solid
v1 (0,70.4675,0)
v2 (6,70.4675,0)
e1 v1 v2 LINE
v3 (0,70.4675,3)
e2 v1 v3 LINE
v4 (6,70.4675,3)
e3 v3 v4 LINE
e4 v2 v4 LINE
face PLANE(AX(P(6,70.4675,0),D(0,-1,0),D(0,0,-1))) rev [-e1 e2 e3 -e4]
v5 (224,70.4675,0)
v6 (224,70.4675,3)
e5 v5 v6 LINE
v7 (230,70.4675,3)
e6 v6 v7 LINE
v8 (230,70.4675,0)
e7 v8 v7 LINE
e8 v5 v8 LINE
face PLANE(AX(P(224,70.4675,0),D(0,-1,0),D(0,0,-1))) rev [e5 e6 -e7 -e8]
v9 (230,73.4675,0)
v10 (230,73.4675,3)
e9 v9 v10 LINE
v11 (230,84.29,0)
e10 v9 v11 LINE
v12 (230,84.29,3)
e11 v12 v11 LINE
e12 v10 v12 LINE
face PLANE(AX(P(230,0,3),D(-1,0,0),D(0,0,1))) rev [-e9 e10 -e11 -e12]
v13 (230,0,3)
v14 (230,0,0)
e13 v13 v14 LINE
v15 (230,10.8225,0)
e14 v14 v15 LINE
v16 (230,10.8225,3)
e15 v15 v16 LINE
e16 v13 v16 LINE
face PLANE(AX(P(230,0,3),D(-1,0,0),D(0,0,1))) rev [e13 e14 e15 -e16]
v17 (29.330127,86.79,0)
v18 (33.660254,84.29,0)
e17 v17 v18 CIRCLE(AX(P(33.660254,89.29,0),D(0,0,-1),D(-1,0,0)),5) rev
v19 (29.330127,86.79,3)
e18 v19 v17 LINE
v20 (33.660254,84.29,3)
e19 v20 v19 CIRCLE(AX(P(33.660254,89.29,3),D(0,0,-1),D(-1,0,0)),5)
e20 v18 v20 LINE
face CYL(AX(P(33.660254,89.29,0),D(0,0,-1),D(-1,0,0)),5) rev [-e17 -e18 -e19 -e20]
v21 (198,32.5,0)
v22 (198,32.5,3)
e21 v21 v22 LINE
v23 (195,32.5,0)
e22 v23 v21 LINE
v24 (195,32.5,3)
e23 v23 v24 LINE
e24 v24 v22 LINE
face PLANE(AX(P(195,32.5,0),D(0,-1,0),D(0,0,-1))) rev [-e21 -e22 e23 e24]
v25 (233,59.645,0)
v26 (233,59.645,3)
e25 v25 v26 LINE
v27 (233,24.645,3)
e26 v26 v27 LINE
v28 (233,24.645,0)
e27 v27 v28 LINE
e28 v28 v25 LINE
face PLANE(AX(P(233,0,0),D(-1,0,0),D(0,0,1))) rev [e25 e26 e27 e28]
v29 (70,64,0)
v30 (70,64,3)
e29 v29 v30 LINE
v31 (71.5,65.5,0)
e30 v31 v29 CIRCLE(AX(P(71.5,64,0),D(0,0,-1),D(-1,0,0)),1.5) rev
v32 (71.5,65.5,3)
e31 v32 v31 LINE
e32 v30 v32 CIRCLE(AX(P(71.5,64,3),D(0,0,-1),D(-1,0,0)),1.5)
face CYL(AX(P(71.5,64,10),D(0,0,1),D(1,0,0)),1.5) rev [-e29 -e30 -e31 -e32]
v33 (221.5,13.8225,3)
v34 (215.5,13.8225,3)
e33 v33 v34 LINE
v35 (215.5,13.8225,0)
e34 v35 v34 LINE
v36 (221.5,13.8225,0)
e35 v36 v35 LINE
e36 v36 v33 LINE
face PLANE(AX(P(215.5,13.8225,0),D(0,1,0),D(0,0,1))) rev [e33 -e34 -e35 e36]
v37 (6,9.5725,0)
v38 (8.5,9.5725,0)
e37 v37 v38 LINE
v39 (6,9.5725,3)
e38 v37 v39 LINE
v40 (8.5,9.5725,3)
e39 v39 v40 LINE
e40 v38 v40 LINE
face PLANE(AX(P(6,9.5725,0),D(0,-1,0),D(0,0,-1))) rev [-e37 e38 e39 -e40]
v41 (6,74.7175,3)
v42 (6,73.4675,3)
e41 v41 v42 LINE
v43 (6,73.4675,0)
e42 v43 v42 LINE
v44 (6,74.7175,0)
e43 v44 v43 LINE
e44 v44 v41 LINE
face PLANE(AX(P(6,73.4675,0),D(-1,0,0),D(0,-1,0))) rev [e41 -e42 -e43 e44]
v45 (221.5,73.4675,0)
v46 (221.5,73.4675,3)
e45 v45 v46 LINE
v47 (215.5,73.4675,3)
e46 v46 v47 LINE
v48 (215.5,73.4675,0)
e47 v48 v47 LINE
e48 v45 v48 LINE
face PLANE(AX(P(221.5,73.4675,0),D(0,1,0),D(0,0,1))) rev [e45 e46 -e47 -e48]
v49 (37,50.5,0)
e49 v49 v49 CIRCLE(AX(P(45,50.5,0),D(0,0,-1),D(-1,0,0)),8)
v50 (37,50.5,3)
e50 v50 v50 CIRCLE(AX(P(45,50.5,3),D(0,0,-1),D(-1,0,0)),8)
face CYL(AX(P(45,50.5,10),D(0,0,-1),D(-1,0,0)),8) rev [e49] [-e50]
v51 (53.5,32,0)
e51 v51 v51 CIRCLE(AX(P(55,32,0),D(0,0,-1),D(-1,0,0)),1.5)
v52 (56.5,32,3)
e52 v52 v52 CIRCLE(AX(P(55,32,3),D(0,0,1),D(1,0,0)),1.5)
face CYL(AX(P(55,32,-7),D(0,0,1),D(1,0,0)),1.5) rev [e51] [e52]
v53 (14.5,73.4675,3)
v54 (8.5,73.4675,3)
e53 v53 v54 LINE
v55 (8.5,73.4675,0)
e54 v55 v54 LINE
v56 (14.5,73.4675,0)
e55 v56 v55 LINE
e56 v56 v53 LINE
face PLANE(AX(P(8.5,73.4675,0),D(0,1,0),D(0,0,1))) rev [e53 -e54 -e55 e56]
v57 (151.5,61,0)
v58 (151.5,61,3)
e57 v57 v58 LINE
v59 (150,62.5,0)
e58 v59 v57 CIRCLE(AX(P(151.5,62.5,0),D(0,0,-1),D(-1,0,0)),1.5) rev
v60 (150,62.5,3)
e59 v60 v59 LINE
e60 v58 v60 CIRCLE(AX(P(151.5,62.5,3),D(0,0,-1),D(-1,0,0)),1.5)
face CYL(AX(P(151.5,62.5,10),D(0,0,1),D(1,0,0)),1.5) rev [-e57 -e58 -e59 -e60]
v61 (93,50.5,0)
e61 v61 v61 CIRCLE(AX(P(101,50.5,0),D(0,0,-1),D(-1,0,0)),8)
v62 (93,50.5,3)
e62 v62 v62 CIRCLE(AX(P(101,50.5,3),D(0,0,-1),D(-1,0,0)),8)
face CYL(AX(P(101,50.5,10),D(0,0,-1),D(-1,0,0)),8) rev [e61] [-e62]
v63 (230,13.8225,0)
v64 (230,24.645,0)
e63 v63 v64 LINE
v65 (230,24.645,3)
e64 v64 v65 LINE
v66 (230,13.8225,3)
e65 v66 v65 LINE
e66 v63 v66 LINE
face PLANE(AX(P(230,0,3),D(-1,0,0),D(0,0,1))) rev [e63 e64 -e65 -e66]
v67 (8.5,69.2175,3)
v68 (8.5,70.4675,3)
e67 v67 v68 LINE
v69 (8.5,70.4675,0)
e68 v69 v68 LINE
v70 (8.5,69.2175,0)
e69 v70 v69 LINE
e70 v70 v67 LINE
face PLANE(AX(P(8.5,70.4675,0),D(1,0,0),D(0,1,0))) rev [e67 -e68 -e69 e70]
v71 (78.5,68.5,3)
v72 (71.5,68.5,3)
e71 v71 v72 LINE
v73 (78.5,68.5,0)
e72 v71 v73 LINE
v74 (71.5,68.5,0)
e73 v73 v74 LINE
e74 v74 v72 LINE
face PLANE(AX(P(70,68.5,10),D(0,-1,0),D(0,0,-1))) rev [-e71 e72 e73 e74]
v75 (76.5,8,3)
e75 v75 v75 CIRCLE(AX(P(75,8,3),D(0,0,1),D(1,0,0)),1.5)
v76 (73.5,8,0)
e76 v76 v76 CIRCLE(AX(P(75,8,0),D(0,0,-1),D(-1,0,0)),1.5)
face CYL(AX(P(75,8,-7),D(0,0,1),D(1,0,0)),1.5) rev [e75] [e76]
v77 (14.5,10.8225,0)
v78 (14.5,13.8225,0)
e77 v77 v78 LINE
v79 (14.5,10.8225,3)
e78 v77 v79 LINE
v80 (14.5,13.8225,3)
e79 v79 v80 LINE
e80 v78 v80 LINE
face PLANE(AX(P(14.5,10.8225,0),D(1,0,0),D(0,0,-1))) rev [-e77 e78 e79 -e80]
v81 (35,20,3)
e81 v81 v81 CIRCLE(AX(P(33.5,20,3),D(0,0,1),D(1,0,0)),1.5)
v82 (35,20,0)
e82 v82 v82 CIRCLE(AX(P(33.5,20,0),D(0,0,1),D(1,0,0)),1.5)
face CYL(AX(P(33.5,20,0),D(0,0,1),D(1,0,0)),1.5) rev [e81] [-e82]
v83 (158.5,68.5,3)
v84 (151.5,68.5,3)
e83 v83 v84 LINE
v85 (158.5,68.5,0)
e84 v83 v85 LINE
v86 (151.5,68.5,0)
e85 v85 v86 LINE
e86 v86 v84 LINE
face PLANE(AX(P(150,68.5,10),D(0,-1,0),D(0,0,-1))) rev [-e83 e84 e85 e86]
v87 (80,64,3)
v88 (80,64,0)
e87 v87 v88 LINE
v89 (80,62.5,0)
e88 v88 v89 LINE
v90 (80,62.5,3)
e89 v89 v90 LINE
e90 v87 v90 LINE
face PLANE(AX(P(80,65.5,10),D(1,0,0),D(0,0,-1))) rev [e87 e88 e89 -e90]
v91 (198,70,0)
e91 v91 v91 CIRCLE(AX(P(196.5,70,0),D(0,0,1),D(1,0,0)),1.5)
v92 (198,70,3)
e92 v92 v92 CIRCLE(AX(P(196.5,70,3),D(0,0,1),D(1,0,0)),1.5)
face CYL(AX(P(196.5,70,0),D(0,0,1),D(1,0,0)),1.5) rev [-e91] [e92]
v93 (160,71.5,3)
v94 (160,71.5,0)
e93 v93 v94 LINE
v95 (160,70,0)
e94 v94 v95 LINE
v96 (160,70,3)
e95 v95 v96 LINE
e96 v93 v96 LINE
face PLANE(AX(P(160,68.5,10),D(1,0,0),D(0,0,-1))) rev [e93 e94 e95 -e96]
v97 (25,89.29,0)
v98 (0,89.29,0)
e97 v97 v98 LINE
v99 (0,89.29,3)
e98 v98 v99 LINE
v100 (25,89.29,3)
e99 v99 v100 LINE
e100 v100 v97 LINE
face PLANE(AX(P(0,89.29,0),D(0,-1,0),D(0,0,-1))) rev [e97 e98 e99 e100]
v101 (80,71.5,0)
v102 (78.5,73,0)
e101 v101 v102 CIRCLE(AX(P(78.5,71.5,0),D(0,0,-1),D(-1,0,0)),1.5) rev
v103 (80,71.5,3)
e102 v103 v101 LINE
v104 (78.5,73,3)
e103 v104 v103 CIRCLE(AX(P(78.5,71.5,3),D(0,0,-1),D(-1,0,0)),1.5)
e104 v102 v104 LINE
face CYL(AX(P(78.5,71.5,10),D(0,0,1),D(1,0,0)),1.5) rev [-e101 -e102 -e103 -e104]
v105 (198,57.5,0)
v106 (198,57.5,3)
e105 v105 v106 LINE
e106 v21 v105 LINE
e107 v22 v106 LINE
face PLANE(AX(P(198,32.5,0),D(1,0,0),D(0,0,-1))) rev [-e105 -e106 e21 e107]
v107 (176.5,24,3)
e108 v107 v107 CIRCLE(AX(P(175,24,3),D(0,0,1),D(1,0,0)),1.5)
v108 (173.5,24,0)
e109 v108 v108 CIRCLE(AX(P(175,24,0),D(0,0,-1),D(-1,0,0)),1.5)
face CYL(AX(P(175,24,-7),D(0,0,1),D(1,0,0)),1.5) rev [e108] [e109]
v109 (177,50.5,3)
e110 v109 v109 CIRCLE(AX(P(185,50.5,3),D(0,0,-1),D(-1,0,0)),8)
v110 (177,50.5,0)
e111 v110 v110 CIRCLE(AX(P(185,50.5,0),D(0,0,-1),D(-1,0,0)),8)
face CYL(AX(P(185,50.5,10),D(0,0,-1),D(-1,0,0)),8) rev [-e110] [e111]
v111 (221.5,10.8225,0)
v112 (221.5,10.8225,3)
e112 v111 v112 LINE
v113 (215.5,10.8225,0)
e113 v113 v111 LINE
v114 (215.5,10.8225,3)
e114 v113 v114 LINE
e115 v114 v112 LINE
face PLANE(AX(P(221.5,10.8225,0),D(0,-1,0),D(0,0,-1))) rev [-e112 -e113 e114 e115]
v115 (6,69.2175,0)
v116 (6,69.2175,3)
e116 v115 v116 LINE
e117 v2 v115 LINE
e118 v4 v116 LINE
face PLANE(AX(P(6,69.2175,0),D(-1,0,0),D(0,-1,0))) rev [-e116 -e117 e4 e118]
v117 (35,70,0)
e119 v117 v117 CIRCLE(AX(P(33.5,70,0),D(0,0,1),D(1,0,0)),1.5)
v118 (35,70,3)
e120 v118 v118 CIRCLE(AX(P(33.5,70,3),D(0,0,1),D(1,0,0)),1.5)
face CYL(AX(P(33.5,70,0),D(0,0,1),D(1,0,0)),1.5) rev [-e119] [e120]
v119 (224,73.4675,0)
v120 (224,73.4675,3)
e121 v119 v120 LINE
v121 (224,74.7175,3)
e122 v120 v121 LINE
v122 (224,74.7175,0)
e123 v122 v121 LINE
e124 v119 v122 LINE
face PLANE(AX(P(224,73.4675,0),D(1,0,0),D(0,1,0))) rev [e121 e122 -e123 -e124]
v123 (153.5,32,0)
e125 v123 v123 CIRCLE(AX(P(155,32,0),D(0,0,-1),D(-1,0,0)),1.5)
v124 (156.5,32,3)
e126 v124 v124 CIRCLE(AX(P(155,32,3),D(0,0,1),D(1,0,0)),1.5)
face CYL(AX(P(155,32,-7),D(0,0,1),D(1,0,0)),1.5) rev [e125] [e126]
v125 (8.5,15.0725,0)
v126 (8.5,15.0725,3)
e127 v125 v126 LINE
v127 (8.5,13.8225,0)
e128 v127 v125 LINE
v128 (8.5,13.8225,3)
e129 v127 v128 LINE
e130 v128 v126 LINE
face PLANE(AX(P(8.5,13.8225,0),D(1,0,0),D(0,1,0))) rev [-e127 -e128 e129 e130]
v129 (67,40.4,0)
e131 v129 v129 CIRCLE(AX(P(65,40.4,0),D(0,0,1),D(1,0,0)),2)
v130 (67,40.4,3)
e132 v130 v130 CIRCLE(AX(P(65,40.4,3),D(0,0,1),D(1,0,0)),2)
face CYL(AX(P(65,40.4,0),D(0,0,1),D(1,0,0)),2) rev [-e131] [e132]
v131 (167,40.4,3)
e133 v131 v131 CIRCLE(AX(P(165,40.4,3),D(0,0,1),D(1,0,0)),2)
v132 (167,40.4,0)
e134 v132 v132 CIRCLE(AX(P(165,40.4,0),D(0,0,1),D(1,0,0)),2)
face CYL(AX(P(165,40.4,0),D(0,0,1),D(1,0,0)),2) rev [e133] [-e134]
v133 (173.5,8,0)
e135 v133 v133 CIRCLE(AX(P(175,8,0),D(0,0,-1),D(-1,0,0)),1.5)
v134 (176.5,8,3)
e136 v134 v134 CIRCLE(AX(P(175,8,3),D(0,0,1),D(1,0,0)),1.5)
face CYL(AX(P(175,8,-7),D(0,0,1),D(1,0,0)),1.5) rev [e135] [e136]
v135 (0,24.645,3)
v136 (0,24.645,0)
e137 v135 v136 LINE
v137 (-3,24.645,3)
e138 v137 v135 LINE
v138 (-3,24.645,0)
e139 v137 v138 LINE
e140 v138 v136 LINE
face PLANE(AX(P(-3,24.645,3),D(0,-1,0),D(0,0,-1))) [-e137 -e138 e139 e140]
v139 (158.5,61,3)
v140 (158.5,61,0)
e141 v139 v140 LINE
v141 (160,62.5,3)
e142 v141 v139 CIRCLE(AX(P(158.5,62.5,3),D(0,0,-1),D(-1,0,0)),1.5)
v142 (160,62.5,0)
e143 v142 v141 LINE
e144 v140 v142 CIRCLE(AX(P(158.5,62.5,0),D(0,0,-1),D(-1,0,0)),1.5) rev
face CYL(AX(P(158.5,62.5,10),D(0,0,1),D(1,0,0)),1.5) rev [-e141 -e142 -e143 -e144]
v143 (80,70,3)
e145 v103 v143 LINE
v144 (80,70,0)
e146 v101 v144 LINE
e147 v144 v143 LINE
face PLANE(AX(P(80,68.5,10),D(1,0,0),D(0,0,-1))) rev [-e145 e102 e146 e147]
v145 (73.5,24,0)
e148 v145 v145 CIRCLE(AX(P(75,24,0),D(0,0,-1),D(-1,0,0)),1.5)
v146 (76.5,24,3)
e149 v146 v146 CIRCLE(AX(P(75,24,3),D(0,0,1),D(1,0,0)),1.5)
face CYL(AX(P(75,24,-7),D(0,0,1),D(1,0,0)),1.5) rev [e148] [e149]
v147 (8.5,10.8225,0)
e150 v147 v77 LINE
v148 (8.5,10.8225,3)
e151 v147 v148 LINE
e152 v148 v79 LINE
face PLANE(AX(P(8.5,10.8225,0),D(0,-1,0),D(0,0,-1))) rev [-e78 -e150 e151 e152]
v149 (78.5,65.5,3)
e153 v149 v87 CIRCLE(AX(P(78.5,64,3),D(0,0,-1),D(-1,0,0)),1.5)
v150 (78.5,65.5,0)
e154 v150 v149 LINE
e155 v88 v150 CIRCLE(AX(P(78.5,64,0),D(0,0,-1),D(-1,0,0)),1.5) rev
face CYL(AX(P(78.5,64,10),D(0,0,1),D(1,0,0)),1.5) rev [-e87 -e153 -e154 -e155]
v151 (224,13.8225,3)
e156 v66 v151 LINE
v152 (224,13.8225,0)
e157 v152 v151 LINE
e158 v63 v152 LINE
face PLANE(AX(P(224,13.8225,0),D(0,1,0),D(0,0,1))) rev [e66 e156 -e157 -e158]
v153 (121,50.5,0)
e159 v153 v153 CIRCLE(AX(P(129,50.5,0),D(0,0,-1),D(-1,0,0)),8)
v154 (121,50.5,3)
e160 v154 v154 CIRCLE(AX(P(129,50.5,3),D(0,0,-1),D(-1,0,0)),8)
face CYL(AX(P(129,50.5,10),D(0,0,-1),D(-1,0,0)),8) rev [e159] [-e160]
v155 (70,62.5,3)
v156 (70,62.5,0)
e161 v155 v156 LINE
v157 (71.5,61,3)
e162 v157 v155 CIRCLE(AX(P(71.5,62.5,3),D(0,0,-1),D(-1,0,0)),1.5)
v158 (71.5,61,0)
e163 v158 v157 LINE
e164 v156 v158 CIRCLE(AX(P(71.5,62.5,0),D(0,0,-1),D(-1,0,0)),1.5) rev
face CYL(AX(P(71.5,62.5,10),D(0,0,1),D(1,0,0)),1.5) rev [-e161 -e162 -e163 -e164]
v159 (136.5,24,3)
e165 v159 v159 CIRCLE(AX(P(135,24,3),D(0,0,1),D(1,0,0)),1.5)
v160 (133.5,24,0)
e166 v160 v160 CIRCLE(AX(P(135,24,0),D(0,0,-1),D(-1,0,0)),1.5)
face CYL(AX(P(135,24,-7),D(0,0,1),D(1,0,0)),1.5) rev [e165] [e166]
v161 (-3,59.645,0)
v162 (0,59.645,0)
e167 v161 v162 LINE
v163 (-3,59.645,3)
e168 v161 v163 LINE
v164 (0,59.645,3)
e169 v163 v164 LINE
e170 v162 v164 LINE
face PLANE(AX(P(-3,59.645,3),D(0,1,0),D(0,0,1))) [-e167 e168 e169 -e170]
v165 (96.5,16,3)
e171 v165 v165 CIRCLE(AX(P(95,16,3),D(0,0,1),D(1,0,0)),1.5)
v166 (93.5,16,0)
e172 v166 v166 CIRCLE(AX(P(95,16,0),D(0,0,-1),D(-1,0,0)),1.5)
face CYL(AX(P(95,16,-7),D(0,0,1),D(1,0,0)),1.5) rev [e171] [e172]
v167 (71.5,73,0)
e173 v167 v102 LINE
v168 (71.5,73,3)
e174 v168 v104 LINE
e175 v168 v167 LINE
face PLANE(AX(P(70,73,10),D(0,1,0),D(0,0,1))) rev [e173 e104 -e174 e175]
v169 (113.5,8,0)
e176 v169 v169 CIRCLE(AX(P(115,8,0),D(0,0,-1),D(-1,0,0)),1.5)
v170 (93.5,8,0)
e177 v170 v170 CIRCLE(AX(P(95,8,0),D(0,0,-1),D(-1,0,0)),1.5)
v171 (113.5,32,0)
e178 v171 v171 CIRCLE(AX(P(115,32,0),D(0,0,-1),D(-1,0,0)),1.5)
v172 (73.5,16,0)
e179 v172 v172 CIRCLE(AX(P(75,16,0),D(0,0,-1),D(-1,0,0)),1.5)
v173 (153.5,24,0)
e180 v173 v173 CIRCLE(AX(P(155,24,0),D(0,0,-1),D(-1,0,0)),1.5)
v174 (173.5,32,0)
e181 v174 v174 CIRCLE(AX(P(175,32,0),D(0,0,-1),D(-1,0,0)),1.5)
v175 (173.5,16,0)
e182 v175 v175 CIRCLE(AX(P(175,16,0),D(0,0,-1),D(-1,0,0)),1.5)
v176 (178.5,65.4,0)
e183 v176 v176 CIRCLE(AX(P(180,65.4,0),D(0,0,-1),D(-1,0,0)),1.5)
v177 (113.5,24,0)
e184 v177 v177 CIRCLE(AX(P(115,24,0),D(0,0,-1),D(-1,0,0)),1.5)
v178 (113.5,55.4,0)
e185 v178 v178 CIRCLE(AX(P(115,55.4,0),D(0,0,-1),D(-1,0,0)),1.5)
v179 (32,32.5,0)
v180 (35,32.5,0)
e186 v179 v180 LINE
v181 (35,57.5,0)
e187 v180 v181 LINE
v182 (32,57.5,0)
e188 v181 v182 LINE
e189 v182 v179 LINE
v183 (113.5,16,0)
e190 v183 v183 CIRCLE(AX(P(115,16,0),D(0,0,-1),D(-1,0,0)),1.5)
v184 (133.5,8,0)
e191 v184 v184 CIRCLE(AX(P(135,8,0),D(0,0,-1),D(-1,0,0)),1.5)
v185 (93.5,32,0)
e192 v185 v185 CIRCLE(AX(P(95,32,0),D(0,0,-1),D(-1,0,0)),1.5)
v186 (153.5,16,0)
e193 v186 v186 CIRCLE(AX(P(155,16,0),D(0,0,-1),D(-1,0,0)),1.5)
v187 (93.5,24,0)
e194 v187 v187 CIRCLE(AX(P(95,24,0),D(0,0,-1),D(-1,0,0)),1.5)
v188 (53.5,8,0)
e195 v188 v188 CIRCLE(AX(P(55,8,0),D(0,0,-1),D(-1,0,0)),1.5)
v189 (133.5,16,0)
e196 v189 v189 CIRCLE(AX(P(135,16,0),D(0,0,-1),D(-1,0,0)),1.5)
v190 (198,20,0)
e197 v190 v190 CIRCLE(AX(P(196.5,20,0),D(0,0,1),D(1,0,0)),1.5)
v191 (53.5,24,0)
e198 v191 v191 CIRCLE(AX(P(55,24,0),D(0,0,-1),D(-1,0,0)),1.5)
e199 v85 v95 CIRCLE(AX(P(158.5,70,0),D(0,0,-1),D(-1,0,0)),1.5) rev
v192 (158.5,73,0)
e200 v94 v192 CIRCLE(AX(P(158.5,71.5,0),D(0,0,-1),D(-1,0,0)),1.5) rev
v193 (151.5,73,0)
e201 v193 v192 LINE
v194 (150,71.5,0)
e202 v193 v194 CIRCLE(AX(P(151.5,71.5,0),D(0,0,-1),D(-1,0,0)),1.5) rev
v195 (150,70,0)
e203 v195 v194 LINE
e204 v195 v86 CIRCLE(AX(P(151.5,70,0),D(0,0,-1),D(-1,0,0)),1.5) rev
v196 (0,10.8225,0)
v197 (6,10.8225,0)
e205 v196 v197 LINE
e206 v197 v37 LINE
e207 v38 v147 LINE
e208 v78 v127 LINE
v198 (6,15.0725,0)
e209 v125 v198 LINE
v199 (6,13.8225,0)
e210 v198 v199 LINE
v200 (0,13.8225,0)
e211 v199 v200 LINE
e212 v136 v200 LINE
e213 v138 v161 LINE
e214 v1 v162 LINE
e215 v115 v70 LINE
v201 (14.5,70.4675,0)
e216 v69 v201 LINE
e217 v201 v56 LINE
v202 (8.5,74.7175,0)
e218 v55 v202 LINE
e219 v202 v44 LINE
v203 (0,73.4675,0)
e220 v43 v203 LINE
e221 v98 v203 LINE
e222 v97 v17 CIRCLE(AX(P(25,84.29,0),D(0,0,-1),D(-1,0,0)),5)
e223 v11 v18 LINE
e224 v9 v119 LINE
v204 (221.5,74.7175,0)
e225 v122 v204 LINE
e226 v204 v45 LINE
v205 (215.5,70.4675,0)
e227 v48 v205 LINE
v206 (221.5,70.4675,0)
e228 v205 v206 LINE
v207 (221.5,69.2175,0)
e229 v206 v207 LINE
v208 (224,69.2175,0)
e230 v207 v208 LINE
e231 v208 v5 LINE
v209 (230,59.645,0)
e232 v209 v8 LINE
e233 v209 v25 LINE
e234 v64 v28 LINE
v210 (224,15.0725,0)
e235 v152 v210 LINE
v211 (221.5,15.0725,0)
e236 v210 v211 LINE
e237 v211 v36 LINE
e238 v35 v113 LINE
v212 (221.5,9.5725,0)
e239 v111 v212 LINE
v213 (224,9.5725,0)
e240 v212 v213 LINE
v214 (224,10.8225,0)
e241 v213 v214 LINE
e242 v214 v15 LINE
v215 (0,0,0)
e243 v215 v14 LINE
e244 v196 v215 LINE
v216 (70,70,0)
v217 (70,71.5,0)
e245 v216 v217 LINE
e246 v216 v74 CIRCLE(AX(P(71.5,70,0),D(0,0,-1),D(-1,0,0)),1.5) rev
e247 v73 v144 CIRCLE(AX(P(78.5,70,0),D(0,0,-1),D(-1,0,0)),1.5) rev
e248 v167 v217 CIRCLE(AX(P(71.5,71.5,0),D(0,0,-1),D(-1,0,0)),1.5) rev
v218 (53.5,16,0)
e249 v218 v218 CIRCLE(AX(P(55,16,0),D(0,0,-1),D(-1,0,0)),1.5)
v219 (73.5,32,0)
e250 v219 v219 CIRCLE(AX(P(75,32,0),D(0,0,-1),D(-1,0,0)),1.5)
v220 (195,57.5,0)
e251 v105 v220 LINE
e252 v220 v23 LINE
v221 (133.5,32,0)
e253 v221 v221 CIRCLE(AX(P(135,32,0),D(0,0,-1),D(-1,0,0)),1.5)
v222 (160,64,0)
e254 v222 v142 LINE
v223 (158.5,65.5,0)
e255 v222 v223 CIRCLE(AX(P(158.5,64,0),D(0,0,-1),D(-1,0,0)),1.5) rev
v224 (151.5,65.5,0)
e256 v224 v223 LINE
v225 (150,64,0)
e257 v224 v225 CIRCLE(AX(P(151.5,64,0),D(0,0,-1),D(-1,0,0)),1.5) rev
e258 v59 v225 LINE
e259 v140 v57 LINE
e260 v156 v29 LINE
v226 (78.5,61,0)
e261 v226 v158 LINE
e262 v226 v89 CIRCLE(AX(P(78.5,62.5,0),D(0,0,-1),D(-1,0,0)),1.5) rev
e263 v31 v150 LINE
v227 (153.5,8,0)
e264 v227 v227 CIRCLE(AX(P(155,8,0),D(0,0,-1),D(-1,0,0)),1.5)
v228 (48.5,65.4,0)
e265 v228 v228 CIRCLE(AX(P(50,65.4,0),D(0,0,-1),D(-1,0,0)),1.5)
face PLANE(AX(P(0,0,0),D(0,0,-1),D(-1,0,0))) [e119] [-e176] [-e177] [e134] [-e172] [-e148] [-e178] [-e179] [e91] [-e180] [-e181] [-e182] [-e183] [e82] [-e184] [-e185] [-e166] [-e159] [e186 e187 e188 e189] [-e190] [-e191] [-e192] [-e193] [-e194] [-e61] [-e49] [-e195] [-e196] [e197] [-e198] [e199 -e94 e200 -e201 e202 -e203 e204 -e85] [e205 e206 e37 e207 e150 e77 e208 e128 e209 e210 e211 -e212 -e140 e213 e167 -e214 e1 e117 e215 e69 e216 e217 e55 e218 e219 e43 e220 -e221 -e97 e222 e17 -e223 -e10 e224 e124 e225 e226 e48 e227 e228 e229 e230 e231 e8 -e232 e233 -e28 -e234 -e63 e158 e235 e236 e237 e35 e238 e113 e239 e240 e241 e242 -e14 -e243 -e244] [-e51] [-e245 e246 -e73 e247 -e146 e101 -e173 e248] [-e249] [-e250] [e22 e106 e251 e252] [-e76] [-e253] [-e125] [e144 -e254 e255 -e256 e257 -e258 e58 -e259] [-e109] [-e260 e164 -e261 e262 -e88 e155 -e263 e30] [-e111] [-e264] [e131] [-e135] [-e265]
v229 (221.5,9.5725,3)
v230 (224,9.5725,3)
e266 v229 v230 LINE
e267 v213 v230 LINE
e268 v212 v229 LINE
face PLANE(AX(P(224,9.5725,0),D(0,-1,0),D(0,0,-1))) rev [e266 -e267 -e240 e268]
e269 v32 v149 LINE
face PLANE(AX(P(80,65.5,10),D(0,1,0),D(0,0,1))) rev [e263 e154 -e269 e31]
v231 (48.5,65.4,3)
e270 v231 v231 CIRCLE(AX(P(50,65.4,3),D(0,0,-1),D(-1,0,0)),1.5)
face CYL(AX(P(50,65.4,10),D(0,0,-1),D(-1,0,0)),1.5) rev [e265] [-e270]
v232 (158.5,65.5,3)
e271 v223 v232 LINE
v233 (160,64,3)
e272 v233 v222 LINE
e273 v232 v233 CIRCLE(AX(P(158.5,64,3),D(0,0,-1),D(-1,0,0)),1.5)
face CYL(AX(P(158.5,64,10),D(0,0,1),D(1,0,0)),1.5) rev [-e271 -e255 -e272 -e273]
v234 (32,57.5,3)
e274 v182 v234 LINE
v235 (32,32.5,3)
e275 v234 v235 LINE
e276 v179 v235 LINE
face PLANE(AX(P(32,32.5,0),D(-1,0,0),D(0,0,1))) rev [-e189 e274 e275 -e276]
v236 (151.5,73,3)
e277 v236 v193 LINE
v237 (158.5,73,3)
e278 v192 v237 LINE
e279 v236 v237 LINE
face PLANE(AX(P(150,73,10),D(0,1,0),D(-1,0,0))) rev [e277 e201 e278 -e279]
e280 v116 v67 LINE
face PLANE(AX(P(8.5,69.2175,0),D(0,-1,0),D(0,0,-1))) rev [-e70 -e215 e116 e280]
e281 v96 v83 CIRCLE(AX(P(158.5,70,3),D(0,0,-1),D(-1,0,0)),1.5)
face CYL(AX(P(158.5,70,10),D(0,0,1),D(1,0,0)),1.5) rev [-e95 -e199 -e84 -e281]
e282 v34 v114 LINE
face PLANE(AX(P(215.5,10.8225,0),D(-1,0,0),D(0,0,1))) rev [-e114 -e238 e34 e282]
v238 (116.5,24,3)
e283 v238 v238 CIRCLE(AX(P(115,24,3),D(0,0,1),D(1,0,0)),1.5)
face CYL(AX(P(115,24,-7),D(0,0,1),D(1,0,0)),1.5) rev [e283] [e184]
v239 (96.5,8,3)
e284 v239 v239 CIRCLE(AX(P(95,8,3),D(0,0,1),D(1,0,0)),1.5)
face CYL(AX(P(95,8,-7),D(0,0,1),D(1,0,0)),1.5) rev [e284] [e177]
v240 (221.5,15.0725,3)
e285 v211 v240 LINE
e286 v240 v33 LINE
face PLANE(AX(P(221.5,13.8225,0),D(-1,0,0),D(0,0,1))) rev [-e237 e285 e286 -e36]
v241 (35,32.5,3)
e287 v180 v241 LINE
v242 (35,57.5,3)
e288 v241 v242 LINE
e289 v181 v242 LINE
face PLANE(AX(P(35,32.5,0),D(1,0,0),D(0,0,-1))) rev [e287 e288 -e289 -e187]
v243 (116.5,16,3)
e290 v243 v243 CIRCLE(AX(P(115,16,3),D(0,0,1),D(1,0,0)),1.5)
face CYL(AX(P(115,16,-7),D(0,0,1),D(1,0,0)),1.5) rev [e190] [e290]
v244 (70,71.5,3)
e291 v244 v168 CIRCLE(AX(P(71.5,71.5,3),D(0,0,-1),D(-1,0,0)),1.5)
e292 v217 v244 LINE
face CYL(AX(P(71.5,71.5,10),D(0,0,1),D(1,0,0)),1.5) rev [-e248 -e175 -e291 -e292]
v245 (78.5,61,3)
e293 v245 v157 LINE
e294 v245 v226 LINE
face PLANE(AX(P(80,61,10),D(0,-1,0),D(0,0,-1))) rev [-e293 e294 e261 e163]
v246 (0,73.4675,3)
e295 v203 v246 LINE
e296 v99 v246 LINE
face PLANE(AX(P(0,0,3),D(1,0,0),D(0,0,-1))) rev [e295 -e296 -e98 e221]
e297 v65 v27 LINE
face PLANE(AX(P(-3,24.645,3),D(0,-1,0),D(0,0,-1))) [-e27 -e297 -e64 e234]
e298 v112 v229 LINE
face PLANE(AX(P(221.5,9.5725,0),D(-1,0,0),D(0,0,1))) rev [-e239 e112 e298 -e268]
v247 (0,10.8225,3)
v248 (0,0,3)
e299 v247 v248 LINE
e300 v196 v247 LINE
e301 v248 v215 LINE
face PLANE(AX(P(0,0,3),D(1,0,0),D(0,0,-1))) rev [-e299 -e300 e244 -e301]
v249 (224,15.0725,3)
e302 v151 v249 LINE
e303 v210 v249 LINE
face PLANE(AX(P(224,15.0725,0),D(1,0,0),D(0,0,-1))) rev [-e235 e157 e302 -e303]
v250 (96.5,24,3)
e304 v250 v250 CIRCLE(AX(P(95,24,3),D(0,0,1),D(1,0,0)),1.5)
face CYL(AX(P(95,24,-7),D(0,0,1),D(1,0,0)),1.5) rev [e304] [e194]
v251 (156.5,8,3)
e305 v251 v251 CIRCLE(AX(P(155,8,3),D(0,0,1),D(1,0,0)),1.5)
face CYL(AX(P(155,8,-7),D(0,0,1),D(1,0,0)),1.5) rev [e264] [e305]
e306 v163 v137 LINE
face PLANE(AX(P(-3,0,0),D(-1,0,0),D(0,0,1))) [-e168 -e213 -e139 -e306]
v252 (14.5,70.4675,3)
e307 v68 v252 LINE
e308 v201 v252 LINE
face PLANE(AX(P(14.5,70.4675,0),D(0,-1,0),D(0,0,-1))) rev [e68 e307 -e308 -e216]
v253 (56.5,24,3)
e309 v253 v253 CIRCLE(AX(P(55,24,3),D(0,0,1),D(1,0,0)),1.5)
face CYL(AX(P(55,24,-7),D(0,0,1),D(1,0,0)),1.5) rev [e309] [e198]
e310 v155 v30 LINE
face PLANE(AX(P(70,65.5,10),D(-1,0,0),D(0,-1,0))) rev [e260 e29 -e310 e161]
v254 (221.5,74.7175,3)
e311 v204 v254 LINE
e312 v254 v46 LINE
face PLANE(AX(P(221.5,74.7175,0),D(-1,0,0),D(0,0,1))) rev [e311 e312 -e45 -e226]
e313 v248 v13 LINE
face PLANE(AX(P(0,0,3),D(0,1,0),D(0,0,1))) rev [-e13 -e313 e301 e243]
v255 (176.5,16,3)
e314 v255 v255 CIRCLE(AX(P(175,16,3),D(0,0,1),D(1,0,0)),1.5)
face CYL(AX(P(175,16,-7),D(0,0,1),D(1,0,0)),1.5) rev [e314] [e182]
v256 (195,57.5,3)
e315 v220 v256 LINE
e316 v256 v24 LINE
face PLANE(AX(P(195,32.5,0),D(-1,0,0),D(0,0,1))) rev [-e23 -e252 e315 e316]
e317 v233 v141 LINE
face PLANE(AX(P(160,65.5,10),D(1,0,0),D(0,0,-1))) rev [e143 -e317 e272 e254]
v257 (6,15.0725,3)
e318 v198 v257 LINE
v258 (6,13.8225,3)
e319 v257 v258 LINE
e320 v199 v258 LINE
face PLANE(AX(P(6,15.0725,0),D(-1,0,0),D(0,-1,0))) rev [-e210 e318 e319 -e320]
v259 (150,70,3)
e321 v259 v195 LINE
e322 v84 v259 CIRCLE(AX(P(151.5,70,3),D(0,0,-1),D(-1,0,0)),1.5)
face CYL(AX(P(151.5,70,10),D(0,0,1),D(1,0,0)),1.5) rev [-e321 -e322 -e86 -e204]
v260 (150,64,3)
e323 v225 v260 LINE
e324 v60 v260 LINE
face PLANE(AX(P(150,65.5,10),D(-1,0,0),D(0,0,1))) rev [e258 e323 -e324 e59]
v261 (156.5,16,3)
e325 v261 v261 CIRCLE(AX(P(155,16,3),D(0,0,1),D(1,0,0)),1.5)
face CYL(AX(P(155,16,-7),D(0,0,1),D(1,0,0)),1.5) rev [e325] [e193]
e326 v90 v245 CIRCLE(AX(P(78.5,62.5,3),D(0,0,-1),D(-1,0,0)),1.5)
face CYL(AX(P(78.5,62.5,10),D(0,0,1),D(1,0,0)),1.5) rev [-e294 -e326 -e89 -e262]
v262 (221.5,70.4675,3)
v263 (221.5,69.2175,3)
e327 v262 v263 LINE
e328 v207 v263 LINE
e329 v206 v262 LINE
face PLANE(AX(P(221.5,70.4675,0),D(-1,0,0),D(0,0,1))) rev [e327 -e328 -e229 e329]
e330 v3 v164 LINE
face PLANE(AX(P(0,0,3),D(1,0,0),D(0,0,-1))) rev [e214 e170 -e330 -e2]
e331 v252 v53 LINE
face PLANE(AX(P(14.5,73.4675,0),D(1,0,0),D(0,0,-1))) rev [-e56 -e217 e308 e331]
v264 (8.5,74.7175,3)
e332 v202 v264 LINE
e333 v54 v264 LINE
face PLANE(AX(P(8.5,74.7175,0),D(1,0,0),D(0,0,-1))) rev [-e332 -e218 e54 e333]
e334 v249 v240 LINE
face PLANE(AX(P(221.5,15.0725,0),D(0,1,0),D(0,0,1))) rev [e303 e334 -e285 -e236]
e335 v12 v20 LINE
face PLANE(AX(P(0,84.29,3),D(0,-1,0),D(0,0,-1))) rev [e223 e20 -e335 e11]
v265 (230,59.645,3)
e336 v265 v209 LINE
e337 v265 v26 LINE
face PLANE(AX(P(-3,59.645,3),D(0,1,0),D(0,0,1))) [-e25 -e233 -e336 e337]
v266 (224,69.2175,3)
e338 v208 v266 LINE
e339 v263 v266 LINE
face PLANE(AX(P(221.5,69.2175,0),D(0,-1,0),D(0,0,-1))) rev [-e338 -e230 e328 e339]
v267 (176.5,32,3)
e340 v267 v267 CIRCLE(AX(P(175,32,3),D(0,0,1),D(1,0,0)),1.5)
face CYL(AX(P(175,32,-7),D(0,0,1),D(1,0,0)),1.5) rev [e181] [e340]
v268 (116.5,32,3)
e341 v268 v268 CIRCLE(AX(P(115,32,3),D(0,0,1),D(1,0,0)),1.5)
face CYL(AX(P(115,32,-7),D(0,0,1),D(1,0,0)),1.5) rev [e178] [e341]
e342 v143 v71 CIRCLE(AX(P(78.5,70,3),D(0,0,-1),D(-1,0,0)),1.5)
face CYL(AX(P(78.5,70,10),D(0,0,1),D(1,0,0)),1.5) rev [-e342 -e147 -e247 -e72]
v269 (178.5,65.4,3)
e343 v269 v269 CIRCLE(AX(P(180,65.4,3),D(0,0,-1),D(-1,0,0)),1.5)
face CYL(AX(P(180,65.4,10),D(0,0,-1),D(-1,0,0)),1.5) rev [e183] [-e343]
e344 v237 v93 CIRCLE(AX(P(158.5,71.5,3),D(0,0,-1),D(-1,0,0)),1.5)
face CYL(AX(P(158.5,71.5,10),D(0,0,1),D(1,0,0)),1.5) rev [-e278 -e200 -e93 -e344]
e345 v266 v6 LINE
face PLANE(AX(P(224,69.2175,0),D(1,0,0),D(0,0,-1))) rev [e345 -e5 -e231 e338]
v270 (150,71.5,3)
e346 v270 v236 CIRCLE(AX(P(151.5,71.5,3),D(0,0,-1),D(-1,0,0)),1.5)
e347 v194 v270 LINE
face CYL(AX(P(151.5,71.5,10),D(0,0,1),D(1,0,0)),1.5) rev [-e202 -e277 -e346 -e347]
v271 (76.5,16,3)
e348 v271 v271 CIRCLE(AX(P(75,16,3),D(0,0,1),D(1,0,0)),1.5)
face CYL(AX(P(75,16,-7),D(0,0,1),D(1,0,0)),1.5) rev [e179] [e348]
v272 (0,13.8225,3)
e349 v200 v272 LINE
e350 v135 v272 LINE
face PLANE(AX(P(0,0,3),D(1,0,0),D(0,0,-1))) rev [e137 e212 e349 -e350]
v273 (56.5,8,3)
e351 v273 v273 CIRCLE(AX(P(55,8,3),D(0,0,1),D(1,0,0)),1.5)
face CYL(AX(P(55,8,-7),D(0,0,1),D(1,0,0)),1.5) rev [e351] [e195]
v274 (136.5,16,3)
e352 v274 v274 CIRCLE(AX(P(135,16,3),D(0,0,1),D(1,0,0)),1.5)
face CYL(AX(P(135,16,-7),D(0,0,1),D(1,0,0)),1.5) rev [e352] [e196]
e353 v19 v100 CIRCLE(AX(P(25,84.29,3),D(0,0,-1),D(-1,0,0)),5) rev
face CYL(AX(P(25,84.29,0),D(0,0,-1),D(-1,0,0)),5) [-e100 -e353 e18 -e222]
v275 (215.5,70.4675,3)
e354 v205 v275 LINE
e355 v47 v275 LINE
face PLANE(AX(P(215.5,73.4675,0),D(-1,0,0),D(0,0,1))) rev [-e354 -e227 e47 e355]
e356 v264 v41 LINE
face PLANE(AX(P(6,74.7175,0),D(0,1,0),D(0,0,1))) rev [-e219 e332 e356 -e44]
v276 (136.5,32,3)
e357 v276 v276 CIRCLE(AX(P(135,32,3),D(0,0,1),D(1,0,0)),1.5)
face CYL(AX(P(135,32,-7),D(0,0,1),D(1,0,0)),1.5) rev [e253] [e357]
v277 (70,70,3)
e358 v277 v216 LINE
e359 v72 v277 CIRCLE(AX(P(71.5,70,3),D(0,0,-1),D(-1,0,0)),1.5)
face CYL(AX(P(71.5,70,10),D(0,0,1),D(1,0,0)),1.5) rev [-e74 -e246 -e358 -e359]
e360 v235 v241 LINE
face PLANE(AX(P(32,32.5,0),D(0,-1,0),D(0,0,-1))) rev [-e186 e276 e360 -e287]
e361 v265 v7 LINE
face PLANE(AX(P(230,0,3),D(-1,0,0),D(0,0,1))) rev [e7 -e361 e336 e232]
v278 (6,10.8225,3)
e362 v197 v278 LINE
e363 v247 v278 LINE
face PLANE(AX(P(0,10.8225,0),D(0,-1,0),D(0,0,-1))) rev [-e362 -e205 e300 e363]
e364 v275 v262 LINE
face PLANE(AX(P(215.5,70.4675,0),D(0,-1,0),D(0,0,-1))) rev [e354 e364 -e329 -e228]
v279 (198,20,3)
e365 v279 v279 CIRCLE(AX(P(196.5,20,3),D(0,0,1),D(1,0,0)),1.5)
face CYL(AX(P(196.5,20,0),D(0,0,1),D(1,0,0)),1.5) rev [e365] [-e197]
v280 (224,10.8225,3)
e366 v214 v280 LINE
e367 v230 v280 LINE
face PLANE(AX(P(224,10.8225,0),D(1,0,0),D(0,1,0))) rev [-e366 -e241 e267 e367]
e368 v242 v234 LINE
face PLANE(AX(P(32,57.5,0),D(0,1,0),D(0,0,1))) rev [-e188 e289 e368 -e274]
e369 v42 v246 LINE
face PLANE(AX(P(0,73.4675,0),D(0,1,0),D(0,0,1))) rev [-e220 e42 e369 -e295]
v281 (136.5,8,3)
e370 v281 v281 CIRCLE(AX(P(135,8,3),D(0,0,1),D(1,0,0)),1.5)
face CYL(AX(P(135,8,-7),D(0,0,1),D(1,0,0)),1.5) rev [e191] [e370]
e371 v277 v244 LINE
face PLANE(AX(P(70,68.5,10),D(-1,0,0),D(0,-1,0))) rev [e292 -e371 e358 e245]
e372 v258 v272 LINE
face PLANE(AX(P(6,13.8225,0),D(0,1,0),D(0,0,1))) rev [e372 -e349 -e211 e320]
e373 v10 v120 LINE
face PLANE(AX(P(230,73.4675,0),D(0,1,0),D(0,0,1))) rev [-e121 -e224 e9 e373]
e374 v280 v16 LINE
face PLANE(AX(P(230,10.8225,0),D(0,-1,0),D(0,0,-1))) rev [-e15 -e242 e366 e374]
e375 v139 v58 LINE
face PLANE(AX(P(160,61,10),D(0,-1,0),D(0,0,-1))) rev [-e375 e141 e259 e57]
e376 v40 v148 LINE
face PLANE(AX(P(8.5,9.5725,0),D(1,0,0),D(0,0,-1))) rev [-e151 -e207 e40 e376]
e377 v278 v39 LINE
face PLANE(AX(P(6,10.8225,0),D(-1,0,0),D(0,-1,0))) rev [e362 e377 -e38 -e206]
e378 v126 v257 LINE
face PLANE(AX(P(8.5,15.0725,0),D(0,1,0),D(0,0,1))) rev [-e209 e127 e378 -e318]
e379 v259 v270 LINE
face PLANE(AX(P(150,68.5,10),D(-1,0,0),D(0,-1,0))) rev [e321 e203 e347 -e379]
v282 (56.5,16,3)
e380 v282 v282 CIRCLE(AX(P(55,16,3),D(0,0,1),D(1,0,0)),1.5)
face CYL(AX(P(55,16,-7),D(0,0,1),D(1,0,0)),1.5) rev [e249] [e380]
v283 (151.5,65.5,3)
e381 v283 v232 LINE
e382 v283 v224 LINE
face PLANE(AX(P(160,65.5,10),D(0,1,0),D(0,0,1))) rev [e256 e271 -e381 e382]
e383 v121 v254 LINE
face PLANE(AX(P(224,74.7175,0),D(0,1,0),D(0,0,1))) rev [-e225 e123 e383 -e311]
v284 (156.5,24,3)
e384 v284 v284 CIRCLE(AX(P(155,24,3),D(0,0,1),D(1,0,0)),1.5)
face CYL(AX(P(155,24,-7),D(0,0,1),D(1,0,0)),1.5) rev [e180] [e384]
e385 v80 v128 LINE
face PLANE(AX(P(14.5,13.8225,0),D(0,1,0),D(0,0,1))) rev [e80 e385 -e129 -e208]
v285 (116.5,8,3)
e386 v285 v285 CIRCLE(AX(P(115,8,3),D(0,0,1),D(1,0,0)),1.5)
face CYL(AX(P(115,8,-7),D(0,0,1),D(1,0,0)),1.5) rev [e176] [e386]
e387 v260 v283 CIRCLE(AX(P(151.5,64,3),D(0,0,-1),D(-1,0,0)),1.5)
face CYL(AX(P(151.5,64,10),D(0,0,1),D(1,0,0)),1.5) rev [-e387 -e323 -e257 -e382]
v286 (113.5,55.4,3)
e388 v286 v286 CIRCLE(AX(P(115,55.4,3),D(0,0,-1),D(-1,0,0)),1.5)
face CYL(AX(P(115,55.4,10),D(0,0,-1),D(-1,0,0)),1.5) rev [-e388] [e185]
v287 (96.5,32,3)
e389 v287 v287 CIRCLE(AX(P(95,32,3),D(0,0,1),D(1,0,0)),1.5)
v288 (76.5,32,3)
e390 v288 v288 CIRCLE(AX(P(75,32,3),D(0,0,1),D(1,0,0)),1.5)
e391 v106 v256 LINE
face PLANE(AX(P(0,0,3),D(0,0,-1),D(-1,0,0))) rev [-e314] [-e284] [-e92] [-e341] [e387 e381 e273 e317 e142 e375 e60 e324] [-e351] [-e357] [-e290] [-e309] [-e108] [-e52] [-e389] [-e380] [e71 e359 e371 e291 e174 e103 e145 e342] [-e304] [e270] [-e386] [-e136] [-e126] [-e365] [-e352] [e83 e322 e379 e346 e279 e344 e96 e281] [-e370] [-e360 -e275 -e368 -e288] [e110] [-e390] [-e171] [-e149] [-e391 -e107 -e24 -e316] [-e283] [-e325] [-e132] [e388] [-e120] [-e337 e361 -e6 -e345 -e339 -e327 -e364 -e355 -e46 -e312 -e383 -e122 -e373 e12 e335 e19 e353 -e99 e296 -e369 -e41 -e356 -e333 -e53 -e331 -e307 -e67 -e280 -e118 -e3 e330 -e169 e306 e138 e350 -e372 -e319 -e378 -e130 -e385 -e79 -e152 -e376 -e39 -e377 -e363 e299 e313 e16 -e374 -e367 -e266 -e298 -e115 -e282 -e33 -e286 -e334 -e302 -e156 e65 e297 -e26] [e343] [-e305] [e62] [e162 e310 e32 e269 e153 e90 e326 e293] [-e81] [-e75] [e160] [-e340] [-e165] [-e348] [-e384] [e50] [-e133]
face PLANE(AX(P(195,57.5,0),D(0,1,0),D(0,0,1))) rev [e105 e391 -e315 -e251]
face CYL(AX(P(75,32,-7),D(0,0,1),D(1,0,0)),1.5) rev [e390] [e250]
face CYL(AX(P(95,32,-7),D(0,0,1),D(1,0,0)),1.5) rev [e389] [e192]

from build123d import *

# Parameters (mm, degrees)
SKETCH_1_W                  = 230
SKETCH_1_H                  = 84.29
EXTRUDE_1_DEPTH             = 3
EXTRUDE_2_DEPTH             = 3
EXTRUDE_2_DEPTH_BACK        = 233
SKETCH_3_W                  = 3
SKETCH_3_H                  = 35
SKETCH_2_R                  = 2
CUT_EXTRUDE_1_DEPTH         = 3
SKETCH_5_R                  = 1.5
CUT_EXTRUDE_2_DEPTH         = 3
SKETCH_6_W                  = 3
SKETCH_6_H                  = 25
CUT_EXTRUDE_3_DEPTH         = 3
CUT_EXTRUDE_4_DEPTH         = 3
SKETCH_8_W                  = 30
SKETCH_8_H                  = 3
EXTRUDE_3_DEPTH             = 5
FILLET_1_R                  = 5
FILLET_2_R                  = 5
SKETCH_9_R                  = 1.5
CUT_EXTRUDE_5_DEPTH         = 10
SKETCH_10_R                 = 8
CUT_EXTRUDE_6_DEPTH         = 10
SKETCH_11_W                 = 10
SKETCH_11_H                 = 4.5
CUT_EXTRUDE_7_DEPTH         = 10
FILLET_3_R                  = 1.5
SKETCH_12_R                 = 1.5
CUT_EXTRUDE_8_DEPTH         = 10
PATTERN_LINEAR_1_COUNT      = 7
PATTERN_LINEAR_1_PITCH      = 20
PATTERN_LINEAR_1_COUNT_DIR2 = 4
PATTERN_LINEAR_1_PITCH_DIR2 = 8


with BuildPart() as part:
    # Эскиз1 → Бобышка-Вытянуть1 (new body)
    with BuildSketch(Plane.XY):
        with Locations((115, 42.145)):
            Rectangle(SKETCH_1_W, SKETCH_1_H)
    extrude(amount=EXTRUDE_1_DEPTH)

    # Эскиз3 → Бобышка-Вытянуть2 (add, two sides: drawn at the far end of the back side and taken through both)
    with BuildSketch(Plane(origin=(230, 0, 0), x_dir=(0, 0, -1), z_dir=(1, 0, 0)).offset(-EXTRUDE_2_DEPTH_BACK)):
        with Locations((-1.5, 42.145)):
            Rectangle(SKETCH_3_W, SKETCH_3_H)
    extrude(amount=EXTRUDE_2_DEPTH + EXTRUDE_2_DEPTH_BACK)

    # Эскиз2 → Вырез-Вытянуть1 (cut)
    with BuildSketch(Plane.XY.offset(3)):
        with Locations((65, 40.4)):
            Circle(SKETCH_2_R)
        with Locations((165, 40.4)):
            Circle(SKETCH_2_R)
    extrude(amount=-CUT_EXTRUDE_1_DEPTH, mode=Mode.SUBTRACT)

    # Эскиз5 → Вырез-Вытянуть2 (cut)
    with BuildSketch(Plane.XY.offset(3)):
        with Locations((33.5, 70)):
            Circle(SKETCH_5_R)
        with Locations((33.5, 20)):
            Circle(SKETCH_5_R)
        with Locations((196.5, 20)):
            Circle(SKETCH_5_R)
        with Locations((196.5, 70)):
            Circle(SKETCH_5_R)
    extrude(amount=-CUT_EXTRUDE_2_DEPTH, mode=Mode.SUBTRACT)

    # Эскиз6 → Вырез-Вытянуть3 (cut)
    with BuildSketch(Plane.XY.offset(3)):
        with Locations((33.5, 45)):
            Rectangle(SKETCH_6_W, SKETCH_6_H)
        with Locations((196.5, 45)):
            Rectangle(SKETCH_6_W, SKETCH_6_H)
    extrude(amount=-CUT_EXTRUDE_3_DEPTH, mode=Mode.SUBTRACT)

    # Эскиз7 → Вырез-Вытянуть4 (cut)
    with BuildSketch(Plane.XY.offset(3)):
        Polygon((0, 73.4675), (6, 73.4675), (6, 74.7175), (8.5, 74.7175), (8.5, 73.4675), (14.5, 73.4675), (14.5, 70.4675), (8.5, 70.4675), (8.5, 69.2175), (6, 69.2175), (6, 70.4675), (0, 70.4675), align=None)
        Polygon((0, 13.8225), (0, 10.8225), (6, 10.8225), (6, 9.5725), (8.5, 9.5725), (8.5, 10.8225), (14.5, 10.8225), (14.5, 13.8225), (8.5, 13.8225), (8.5, 15.0725), (6, 15.0725), (6, 13.8225), align=None)
        Polygon((230, 10.8225), (224, 10.8225), (224, 9.5725), (221.5, 9.5725), (221.5, 10.8225), (215.5, 10.8225), (215.5, 13.8225), (221.5, 13.8225), (221.5, 15.0725), (224, 15.0725), (224, 13.8225), (230, 13.8225), align=None)
        Polygon((230, 70.4675), (230, 73.4675), (224, 73.4675), (224, 74.7175), (221.5, 74.7175), (221.5, 73.4675), (215.5, 73.4675), (215.5, 70.4675), (221.5, 70.4675), (221.5, 69.2175), (224, 69.2175), (224, 70.4675), align=None)
    extrude(amount=-CUT_EXTRUDE_4_DEPTH, mode=Mode.SUBTRACT)

    # Эскиз8 → Бобышка-Вытянуть3 (add)
    with BuildSketch(Plane(origin=(0, 84.29, 0), x_dir=(1, 0, 0), z_dir=(0, 1, 0))):
        with Locations((15, -1.5)):
            Rectangle(SKETCH_8_W, SKETCH_8_H)
    extrude(amount=EXTRUDE_3_DEPTH)

    # Скругление1
    fillet_1_edges = [part.edges().sort_by_distance(p)[0] for p in [
        (30, 89.29, 1.5),
    ]]
    fillet(fillet_1_edges, radius=FILLET_1_R - 0.0001)  # a hair under: the kernel refuses the full size

    # Скругление2
    fillet_2_edges = [part.edges().sort_by_distance(p)[0] for p in [
        (30, 84.29, 1.5),
    ]]
    fillet(fillet_2_edges, radius=FILLET_2_R)

    # Эскиз9 → Вырез-Вытянуть5 (cut)
    with BuildSketch(Plane(origin=(0, 0, 0), x_dir=(-1, 0, 0), z_dir=(0, 0, -1))):
        with Locations((-180, 65.4)):
            Circle(SKETCH_9_R)
        with Locations((-50, 65.4)):
            Circle(SKETCH_9_R)
        with Locations((-115, 55.4)):
            Circle(SKETCH_9_R)
    extrude(amount=-CUT_EXTRUDE_5_DEPTH, mode=Mode.SUBTRACT)

    # Эскиз10 → Вырез-Вытянуть6 (cut)
    with BuildSketch(Plane(origin=(0, 0, 0), x_dir=(-1, 0, 0), z_dir=(0, 0, -1))):
        with Locations((-185, 50.5)):
            Circle(SKETCH_10_R)
        with Locations((-129, 50.5)):
            Circle(SKETCH_10_R)
        with Locations((-101, 50.5)):
            Circle(SKETCH_10_R)
        with Locations((-45, 50.5)):
            Circle(SKETCH_10_R)
    extrude(amount=-CUT_EXTRUDE_6_DEPTH, mode=Mode.SUBTRACT)

    # Эскиз11 → Вырез-Вытянуть7 (cut)
    with BuildSketch(Plane(origin=(0, 0, 0), x_dir=(-1, 0, 0), z_dir=(0, 0, -1))):
        with Locations((-155, 63.25)):
            Rectangle(SKETCH_11_W, SKETCH_11_H)
        with Locations((-75, 63.25)):
            Rectangle(SKETCH_11_W, SKETCH_11_H)
        with Locations((-75, 70.75)):
            Rectangle(SKETCH_11_W, SKETCH_11_H)
        with Locations((-155, 70.75)):
            Rectangle(SKETCH_11_W, SKETCH_11_H)
    extrude(amount=-CUT_EXTRUDE_7_DEPTH, mode=Mode.SUBTRACT)

    # Скругление3
    fillet_3_edges = [part.edges().sort_by_distance(p)[0] for p in [
        (160, 61, 1.5),
        (160, 65.5, 1.5),
        (150, 65.5, 1.5),
        (150, 61, 1.5),
        (80, 61, 1.5),
        (80, 65.5, 1.5),
        (70, 65.5, 1.5),
        (70, 61, 1.5),
        (70, 73, 1.5),
        (70, 68.5, 1.5),
        (80, 68.5, 1.5),
        (80, 73, 1.5),
        (150, 73, 1.5),
        (150, 68.5, 1.5),
        (160, 68.5, 1.5),
        (160, 73, 1.5),
    ]]
    fillet(fillet_3_edges, radius=FILLET_3_R)

    # Эскиз12 → Вырез-Вытянуть8 (cut)
    with BuildSketch(Plane.XY.offset(3)):
        with Locations((55, 8)):
            Circle(SKETCH_12_R)
    cut_extrude_8 = extrude(amount=-CUT_EXTRUDE_8_DEPTH, mode=Mode.SUBTRACT)

    # Линейный массив1: Cut-Extrude 8 7 × 4
    with Locations(*[(i * PATTERN_LINEAR_1_PITCH, j * PATTERN_LINEAR_1_PITCH_DIR2, 0) for i in range(PATTERN_LINEAR_1_COUNT) for j in range(PATTERN_LINEAR_1_COUNT_DIR2) if (i, j) != (0, 0)]):
        add(cut_extrude_8, mode=Mode.SUBTRACT)


solid = part.part
